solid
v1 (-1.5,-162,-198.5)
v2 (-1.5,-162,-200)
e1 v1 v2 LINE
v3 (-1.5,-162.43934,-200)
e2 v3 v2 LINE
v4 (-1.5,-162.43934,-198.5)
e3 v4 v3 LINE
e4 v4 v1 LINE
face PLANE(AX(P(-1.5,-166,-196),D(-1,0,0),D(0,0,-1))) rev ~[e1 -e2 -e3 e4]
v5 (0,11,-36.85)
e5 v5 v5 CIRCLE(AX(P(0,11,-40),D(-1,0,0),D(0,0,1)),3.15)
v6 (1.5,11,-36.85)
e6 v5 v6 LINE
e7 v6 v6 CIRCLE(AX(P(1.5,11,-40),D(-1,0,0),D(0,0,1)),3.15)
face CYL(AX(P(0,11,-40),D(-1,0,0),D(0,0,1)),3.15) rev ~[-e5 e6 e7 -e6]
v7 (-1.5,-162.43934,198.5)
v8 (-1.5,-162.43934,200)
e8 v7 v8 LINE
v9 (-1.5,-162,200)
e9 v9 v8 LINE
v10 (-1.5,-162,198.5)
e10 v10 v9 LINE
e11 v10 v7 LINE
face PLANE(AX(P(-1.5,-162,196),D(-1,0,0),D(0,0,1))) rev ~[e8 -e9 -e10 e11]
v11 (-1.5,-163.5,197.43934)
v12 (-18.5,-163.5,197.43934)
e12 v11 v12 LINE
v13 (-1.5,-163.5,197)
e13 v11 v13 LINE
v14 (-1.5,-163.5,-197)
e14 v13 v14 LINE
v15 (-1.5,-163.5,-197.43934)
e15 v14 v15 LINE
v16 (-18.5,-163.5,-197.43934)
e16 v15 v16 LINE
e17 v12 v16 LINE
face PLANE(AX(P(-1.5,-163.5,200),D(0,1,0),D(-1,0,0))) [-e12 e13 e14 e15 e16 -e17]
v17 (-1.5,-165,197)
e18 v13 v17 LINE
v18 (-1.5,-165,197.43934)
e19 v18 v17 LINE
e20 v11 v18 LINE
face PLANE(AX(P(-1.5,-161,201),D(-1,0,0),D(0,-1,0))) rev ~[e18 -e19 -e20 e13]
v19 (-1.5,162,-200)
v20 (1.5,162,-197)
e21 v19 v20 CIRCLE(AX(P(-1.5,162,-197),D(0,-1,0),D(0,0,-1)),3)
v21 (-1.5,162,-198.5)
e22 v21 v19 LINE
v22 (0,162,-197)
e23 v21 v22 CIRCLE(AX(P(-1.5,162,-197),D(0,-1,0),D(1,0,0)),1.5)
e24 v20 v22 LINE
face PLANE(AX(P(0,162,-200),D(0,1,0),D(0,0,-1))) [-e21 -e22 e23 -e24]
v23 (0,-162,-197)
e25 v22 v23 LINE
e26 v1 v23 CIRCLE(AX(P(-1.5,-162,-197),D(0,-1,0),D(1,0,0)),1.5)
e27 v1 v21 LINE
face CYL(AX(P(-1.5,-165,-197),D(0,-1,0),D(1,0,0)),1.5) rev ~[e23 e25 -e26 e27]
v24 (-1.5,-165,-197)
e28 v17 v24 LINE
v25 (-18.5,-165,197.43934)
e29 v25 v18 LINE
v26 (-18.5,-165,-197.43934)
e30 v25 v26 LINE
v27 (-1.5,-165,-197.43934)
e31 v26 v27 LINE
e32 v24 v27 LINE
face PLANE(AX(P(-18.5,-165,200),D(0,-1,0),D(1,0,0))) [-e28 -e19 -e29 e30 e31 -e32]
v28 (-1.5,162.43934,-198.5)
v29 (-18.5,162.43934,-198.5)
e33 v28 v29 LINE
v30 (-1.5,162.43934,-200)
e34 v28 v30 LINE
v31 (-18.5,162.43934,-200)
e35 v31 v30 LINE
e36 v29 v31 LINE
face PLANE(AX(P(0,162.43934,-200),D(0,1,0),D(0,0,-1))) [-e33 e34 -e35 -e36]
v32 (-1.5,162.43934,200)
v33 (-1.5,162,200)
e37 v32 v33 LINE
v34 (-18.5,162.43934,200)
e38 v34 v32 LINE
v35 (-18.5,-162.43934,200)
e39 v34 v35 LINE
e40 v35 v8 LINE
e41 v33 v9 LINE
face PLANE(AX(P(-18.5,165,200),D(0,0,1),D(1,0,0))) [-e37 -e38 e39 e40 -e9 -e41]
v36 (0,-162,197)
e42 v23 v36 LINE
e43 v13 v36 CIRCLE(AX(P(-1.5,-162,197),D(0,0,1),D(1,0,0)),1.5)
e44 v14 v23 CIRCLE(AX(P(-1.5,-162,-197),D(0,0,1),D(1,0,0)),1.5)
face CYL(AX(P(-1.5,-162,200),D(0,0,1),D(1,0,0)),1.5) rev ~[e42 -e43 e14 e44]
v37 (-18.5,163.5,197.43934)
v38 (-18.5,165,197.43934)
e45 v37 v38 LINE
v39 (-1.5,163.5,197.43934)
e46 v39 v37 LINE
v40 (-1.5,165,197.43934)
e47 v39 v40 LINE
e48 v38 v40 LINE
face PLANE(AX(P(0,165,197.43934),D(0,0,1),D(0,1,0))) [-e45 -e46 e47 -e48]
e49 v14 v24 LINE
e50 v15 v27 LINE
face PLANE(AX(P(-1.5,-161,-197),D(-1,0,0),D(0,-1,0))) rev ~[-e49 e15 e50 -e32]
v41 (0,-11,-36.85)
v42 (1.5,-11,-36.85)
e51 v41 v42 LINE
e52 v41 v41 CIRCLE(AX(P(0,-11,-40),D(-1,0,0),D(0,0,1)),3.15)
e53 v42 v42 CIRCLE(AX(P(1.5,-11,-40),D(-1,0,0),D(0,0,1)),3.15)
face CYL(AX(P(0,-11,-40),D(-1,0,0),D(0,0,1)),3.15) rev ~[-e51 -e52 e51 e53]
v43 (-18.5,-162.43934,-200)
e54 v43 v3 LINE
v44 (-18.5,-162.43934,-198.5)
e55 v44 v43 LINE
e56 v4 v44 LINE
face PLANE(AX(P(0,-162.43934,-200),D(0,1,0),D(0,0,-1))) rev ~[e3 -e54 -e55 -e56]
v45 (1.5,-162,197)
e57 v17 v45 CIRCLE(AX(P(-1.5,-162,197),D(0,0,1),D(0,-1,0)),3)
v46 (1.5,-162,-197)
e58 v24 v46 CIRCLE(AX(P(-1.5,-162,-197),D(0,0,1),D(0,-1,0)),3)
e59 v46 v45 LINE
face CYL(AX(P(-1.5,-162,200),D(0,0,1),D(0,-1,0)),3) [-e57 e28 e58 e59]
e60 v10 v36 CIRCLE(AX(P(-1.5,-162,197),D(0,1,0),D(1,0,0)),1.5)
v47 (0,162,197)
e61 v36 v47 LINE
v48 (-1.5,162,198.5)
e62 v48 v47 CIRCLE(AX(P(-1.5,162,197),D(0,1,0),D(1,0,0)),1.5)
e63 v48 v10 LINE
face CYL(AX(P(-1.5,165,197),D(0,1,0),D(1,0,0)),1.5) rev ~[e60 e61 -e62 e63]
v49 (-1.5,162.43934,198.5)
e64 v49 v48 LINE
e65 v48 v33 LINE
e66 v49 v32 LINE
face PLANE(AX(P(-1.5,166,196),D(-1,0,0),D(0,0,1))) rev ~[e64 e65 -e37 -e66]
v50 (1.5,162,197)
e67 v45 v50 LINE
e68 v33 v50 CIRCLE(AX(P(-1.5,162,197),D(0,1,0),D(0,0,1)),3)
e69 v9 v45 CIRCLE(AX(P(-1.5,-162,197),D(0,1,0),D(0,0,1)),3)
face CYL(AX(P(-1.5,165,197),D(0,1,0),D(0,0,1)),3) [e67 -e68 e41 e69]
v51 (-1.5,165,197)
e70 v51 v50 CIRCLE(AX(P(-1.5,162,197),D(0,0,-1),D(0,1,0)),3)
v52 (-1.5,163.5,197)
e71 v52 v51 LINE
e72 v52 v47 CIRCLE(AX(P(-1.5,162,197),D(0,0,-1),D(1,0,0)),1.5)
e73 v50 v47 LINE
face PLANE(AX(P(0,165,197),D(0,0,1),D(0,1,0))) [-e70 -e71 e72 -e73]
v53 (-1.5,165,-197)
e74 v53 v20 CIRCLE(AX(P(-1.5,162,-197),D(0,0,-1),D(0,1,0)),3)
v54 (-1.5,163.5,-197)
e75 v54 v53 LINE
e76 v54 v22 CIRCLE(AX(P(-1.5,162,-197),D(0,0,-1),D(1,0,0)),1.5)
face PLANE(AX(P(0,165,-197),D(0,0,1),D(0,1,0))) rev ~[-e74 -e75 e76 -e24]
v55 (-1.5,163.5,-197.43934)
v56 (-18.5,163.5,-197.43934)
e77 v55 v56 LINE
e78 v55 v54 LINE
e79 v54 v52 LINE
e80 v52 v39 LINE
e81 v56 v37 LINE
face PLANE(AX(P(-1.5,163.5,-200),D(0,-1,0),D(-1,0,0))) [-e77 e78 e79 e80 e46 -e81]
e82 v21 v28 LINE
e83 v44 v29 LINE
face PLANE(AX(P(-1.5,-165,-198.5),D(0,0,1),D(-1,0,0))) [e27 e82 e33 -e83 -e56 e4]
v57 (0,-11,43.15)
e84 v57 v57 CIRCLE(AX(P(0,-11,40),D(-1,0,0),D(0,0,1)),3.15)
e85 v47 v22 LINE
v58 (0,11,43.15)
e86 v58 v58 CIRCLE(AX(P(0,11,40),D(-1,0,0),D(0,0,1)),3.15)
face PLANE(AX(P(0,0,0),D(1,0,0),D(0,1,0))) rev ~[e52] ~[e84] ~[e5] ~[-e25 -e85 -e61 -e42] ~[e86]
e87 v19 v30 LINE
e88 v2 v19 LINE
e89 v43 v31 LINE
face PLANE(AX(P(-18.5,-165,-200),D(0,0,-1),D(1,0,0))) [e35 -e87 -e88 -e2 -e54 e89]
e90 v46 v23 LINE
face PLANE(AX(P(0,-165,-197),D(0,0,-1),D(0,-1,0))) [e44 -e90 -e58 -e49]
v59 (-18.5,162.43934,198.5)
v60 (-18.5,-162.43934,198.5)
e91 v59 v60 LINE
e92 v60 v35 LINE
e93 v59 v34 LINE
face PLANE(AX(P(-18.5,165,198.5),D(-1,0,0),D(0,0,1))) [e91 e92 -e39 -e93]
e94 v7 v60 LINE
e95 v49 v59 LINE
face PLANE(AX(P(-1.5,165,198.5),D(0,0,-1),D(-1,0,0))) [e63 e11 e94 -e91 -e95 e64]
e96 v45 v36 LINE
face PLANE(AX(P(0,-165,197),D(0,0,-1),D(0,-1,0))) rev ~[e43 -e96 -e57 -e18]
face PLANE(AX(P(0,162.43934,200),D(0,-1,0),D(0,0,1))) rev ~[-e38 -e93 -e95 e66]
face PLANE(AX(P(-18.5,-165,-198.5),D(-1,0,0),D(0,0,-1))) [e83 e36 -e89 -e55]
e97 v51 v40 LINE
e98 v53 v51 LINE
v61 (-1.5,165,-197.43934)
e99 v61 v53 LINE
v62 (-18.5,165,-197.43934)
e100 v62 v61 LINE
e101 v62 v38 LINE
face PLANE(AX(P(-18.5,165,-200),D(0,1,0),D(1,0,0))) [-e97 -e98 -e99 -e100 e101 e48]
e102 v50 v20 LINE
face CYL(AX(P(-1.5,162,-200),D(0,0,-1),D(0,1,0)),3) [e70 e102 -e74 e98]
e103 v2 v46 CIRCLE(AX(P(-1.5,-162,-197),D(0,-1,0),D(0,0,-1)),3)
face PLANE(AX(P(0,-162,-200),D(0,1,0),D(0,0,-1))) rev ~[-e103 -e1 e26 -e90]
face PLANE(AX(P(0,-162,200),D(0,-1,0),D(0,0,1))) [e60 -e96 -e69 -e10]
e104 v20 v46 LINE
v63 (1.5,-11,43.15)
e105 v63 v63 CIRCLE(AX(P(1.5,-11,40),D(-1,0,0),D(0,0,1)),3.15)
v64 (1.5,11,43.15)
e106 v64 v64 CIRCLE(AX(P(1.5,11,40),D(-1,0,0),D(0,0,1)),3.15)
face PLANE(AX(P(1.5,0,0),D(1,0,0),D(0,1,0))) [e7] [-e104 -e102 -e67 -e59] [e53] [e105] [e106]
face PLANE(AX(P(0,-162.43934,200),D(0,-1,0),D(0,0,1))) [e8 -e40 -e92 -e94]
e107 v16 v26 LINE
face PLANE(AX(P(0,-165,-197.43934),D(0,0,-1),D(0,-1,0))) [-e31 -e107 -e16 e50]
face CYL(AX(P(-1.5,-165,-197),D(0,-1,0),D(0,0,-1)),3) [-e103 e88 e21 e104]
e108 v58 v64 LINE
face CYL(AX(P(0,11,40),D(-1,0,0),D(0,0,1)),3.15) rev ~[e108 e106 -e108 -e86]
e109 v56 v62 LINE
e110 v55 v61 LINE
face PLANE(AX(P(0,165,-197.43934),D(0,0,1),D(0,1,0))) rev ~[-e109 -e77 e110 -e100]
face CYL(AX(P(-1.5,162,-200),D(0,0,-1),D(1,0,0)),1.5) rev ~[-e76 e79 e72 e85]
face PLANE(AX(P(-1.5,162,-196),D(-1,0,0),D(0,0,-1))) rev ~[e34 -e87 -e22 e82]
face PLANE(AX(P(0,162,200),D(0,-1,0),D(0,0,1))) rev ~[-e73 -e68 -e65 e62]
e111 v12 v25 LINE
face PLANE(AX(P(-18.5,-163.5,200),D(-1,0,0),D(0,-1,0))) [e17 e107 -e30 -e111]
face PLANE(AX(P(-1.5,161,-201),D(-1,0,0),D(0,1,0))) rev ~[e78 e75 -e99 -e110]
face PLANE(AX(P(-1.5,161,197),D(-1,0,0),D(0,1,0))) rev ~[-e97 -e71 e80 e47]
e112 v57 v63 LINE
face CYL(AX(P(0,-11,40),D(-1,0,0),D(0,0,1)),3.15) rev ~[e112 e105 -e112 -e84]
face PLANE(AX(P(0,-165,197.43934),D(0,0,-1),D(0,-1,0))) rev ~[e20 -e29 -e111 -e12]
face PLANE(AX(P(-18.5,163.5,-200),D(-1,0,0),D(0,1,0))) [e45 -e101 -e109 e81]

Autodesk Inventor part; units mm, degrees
ref_plane "YZ Plane" through (0, 0, 0) normal (1, 0, 0) x (0, 1, 0)
ref_plane "XZ Plane" through (0, 0, 0) normal (0, 1, 0) x (-1, 0, 0)
ref_plane "XY Plane" through (0, 0, 0) normal (0, 0, 1) x (1, 0, 0)
sketch "Sketch1" plane through (0, 0, 0) normal (1, 0, 0) x (0, 1, 0)
  line L0 (165, 200) -> (-165, 200)
  line L1 (-165, 200) -> (-165, -200)
  line L2 (-165, -200) -> (165, -200)
  line L3 (165, -200) -> (165, 200)
  line L4 (165, 200) -> (-165, -200) construction
  line L5 (-165, 200) -> (165, -200) construction
  point P0 (0, 0)
  dimension "d0" = 330
  dimension "d1" = 400
extrude "Plate1" add sketch "Sketch1" along normal blind 1.5
sketch "Sketch2" plane through (1.5, 165, 198.5) normal (0, 0, 1) x (1, 0, 0)
  line L0 (0, -330) -> (0, 0)
  line L1 (0, 0) -> (-20, 0)
  line L2 (-20, 0) -> (-20, -330)
  line L3 (-20, -330) -> (0, -330)
edge flange "Flange1" height 20 angle 90 thickness 1.5 bend radius 1.5 thickness toward (0, 0, 1) relief tear relief width 1.5 relief depth 0.75 corner gap 1.5 corner form 2 edges at (0, 0, 200) (0, 165, 0) (0, 0, -200) (0, -165, 0) wall of the first edge with corners at (1.5, -165, 198.5) (1.5, 165, 198.5) (-18.5, 165, 198.5) (-18.5, -165, 198.5)
bend "Bend1"
corner "Corner1"
sketch "Sketch4" plane through (0, 0, 0) normal (-1, 0, 0) x (0, 0, 1)
  circle A0 centre (-40, 11) radius 3.15
  line L0 (0, 0) -> (-5.5711, 0)
  line L1 (0, 0) -> (-6.9523, 0)
  line L2 (0, 0) -> (0, 7.85)
  circle A1 centre (-40, -11) radius 3.15
  circle A2 centre (40, 11) radius 3.15
  circle A3 centre (40, -11) radius 3.15
  dimension "d21" = 6.3
  dimension "d22" = 40
  dimension "d23" = 11
extrude "Cut2" cut sketch "Sketch4" against normal blind 1.5
equation "\"d0\" = C_height"
equation "\"d1\" = C_length"
equation "\"d24\" = Thickness"
equation "\"d2\" = Thickness"
equation "\"d3\" = BendReliefWidth"
equation "\"d4\" = BendReliefDepth"
equation "\"d5\" = MinimumRemnant"
equation "\"d6\" = TransitionRadius"
equation "\"d7\" = C_width"
equation "\"d9\" = BendRadius"
equation "\"d10\" = CornerReliefSize"
equation "\"d11\" = GapSize"
equation "\"d12\" = JacobiRadiusSize"
equation "\"BendRadius\" = Thickness"
equation "\"BendReliefWidth\" = Thickness"
equation "\"BendReliefDepth\" = 0.5 * Thickness"
equation "\"CornerReliefSize\" = 4 * Thickness"
equation "\"MinimumRemnant\" = 2 * Thickness"
equation "\"TransitionRadius\" = BendRadius"
equation "\"JacobiRadiusSize\" = BendRadius"
equation "\"GapSize\" = Thickness"
equation "\"A_width\" = 46"
equation "\"A_joint_diameter\" = 16"
equation "\"A_joint_tolerance\" = 3"
equation "\"l___________\" = 0"
equation "\"l__________\" = 0"
equation "\"C_length\" = 400"
equation "\"C_height\" = 330"
equation "\"l_________\" = 0"
equation "\"rivet_diameter\" = 3.35"
equation "\"plate_thickness\" = 3"
equation "\"l________\" = 0"
equation "\"A_B_spacing\" = 2"
equation "\"L_Piston_Bottom\" = 21"
equation "\"L_Piston_Top\" = 25"
equation "\"thin_plate\" = 1.5"
equation "\"Thickness\" = 1.5"
equation "\"C_width\" = 20"
properties part number "C_plate"
